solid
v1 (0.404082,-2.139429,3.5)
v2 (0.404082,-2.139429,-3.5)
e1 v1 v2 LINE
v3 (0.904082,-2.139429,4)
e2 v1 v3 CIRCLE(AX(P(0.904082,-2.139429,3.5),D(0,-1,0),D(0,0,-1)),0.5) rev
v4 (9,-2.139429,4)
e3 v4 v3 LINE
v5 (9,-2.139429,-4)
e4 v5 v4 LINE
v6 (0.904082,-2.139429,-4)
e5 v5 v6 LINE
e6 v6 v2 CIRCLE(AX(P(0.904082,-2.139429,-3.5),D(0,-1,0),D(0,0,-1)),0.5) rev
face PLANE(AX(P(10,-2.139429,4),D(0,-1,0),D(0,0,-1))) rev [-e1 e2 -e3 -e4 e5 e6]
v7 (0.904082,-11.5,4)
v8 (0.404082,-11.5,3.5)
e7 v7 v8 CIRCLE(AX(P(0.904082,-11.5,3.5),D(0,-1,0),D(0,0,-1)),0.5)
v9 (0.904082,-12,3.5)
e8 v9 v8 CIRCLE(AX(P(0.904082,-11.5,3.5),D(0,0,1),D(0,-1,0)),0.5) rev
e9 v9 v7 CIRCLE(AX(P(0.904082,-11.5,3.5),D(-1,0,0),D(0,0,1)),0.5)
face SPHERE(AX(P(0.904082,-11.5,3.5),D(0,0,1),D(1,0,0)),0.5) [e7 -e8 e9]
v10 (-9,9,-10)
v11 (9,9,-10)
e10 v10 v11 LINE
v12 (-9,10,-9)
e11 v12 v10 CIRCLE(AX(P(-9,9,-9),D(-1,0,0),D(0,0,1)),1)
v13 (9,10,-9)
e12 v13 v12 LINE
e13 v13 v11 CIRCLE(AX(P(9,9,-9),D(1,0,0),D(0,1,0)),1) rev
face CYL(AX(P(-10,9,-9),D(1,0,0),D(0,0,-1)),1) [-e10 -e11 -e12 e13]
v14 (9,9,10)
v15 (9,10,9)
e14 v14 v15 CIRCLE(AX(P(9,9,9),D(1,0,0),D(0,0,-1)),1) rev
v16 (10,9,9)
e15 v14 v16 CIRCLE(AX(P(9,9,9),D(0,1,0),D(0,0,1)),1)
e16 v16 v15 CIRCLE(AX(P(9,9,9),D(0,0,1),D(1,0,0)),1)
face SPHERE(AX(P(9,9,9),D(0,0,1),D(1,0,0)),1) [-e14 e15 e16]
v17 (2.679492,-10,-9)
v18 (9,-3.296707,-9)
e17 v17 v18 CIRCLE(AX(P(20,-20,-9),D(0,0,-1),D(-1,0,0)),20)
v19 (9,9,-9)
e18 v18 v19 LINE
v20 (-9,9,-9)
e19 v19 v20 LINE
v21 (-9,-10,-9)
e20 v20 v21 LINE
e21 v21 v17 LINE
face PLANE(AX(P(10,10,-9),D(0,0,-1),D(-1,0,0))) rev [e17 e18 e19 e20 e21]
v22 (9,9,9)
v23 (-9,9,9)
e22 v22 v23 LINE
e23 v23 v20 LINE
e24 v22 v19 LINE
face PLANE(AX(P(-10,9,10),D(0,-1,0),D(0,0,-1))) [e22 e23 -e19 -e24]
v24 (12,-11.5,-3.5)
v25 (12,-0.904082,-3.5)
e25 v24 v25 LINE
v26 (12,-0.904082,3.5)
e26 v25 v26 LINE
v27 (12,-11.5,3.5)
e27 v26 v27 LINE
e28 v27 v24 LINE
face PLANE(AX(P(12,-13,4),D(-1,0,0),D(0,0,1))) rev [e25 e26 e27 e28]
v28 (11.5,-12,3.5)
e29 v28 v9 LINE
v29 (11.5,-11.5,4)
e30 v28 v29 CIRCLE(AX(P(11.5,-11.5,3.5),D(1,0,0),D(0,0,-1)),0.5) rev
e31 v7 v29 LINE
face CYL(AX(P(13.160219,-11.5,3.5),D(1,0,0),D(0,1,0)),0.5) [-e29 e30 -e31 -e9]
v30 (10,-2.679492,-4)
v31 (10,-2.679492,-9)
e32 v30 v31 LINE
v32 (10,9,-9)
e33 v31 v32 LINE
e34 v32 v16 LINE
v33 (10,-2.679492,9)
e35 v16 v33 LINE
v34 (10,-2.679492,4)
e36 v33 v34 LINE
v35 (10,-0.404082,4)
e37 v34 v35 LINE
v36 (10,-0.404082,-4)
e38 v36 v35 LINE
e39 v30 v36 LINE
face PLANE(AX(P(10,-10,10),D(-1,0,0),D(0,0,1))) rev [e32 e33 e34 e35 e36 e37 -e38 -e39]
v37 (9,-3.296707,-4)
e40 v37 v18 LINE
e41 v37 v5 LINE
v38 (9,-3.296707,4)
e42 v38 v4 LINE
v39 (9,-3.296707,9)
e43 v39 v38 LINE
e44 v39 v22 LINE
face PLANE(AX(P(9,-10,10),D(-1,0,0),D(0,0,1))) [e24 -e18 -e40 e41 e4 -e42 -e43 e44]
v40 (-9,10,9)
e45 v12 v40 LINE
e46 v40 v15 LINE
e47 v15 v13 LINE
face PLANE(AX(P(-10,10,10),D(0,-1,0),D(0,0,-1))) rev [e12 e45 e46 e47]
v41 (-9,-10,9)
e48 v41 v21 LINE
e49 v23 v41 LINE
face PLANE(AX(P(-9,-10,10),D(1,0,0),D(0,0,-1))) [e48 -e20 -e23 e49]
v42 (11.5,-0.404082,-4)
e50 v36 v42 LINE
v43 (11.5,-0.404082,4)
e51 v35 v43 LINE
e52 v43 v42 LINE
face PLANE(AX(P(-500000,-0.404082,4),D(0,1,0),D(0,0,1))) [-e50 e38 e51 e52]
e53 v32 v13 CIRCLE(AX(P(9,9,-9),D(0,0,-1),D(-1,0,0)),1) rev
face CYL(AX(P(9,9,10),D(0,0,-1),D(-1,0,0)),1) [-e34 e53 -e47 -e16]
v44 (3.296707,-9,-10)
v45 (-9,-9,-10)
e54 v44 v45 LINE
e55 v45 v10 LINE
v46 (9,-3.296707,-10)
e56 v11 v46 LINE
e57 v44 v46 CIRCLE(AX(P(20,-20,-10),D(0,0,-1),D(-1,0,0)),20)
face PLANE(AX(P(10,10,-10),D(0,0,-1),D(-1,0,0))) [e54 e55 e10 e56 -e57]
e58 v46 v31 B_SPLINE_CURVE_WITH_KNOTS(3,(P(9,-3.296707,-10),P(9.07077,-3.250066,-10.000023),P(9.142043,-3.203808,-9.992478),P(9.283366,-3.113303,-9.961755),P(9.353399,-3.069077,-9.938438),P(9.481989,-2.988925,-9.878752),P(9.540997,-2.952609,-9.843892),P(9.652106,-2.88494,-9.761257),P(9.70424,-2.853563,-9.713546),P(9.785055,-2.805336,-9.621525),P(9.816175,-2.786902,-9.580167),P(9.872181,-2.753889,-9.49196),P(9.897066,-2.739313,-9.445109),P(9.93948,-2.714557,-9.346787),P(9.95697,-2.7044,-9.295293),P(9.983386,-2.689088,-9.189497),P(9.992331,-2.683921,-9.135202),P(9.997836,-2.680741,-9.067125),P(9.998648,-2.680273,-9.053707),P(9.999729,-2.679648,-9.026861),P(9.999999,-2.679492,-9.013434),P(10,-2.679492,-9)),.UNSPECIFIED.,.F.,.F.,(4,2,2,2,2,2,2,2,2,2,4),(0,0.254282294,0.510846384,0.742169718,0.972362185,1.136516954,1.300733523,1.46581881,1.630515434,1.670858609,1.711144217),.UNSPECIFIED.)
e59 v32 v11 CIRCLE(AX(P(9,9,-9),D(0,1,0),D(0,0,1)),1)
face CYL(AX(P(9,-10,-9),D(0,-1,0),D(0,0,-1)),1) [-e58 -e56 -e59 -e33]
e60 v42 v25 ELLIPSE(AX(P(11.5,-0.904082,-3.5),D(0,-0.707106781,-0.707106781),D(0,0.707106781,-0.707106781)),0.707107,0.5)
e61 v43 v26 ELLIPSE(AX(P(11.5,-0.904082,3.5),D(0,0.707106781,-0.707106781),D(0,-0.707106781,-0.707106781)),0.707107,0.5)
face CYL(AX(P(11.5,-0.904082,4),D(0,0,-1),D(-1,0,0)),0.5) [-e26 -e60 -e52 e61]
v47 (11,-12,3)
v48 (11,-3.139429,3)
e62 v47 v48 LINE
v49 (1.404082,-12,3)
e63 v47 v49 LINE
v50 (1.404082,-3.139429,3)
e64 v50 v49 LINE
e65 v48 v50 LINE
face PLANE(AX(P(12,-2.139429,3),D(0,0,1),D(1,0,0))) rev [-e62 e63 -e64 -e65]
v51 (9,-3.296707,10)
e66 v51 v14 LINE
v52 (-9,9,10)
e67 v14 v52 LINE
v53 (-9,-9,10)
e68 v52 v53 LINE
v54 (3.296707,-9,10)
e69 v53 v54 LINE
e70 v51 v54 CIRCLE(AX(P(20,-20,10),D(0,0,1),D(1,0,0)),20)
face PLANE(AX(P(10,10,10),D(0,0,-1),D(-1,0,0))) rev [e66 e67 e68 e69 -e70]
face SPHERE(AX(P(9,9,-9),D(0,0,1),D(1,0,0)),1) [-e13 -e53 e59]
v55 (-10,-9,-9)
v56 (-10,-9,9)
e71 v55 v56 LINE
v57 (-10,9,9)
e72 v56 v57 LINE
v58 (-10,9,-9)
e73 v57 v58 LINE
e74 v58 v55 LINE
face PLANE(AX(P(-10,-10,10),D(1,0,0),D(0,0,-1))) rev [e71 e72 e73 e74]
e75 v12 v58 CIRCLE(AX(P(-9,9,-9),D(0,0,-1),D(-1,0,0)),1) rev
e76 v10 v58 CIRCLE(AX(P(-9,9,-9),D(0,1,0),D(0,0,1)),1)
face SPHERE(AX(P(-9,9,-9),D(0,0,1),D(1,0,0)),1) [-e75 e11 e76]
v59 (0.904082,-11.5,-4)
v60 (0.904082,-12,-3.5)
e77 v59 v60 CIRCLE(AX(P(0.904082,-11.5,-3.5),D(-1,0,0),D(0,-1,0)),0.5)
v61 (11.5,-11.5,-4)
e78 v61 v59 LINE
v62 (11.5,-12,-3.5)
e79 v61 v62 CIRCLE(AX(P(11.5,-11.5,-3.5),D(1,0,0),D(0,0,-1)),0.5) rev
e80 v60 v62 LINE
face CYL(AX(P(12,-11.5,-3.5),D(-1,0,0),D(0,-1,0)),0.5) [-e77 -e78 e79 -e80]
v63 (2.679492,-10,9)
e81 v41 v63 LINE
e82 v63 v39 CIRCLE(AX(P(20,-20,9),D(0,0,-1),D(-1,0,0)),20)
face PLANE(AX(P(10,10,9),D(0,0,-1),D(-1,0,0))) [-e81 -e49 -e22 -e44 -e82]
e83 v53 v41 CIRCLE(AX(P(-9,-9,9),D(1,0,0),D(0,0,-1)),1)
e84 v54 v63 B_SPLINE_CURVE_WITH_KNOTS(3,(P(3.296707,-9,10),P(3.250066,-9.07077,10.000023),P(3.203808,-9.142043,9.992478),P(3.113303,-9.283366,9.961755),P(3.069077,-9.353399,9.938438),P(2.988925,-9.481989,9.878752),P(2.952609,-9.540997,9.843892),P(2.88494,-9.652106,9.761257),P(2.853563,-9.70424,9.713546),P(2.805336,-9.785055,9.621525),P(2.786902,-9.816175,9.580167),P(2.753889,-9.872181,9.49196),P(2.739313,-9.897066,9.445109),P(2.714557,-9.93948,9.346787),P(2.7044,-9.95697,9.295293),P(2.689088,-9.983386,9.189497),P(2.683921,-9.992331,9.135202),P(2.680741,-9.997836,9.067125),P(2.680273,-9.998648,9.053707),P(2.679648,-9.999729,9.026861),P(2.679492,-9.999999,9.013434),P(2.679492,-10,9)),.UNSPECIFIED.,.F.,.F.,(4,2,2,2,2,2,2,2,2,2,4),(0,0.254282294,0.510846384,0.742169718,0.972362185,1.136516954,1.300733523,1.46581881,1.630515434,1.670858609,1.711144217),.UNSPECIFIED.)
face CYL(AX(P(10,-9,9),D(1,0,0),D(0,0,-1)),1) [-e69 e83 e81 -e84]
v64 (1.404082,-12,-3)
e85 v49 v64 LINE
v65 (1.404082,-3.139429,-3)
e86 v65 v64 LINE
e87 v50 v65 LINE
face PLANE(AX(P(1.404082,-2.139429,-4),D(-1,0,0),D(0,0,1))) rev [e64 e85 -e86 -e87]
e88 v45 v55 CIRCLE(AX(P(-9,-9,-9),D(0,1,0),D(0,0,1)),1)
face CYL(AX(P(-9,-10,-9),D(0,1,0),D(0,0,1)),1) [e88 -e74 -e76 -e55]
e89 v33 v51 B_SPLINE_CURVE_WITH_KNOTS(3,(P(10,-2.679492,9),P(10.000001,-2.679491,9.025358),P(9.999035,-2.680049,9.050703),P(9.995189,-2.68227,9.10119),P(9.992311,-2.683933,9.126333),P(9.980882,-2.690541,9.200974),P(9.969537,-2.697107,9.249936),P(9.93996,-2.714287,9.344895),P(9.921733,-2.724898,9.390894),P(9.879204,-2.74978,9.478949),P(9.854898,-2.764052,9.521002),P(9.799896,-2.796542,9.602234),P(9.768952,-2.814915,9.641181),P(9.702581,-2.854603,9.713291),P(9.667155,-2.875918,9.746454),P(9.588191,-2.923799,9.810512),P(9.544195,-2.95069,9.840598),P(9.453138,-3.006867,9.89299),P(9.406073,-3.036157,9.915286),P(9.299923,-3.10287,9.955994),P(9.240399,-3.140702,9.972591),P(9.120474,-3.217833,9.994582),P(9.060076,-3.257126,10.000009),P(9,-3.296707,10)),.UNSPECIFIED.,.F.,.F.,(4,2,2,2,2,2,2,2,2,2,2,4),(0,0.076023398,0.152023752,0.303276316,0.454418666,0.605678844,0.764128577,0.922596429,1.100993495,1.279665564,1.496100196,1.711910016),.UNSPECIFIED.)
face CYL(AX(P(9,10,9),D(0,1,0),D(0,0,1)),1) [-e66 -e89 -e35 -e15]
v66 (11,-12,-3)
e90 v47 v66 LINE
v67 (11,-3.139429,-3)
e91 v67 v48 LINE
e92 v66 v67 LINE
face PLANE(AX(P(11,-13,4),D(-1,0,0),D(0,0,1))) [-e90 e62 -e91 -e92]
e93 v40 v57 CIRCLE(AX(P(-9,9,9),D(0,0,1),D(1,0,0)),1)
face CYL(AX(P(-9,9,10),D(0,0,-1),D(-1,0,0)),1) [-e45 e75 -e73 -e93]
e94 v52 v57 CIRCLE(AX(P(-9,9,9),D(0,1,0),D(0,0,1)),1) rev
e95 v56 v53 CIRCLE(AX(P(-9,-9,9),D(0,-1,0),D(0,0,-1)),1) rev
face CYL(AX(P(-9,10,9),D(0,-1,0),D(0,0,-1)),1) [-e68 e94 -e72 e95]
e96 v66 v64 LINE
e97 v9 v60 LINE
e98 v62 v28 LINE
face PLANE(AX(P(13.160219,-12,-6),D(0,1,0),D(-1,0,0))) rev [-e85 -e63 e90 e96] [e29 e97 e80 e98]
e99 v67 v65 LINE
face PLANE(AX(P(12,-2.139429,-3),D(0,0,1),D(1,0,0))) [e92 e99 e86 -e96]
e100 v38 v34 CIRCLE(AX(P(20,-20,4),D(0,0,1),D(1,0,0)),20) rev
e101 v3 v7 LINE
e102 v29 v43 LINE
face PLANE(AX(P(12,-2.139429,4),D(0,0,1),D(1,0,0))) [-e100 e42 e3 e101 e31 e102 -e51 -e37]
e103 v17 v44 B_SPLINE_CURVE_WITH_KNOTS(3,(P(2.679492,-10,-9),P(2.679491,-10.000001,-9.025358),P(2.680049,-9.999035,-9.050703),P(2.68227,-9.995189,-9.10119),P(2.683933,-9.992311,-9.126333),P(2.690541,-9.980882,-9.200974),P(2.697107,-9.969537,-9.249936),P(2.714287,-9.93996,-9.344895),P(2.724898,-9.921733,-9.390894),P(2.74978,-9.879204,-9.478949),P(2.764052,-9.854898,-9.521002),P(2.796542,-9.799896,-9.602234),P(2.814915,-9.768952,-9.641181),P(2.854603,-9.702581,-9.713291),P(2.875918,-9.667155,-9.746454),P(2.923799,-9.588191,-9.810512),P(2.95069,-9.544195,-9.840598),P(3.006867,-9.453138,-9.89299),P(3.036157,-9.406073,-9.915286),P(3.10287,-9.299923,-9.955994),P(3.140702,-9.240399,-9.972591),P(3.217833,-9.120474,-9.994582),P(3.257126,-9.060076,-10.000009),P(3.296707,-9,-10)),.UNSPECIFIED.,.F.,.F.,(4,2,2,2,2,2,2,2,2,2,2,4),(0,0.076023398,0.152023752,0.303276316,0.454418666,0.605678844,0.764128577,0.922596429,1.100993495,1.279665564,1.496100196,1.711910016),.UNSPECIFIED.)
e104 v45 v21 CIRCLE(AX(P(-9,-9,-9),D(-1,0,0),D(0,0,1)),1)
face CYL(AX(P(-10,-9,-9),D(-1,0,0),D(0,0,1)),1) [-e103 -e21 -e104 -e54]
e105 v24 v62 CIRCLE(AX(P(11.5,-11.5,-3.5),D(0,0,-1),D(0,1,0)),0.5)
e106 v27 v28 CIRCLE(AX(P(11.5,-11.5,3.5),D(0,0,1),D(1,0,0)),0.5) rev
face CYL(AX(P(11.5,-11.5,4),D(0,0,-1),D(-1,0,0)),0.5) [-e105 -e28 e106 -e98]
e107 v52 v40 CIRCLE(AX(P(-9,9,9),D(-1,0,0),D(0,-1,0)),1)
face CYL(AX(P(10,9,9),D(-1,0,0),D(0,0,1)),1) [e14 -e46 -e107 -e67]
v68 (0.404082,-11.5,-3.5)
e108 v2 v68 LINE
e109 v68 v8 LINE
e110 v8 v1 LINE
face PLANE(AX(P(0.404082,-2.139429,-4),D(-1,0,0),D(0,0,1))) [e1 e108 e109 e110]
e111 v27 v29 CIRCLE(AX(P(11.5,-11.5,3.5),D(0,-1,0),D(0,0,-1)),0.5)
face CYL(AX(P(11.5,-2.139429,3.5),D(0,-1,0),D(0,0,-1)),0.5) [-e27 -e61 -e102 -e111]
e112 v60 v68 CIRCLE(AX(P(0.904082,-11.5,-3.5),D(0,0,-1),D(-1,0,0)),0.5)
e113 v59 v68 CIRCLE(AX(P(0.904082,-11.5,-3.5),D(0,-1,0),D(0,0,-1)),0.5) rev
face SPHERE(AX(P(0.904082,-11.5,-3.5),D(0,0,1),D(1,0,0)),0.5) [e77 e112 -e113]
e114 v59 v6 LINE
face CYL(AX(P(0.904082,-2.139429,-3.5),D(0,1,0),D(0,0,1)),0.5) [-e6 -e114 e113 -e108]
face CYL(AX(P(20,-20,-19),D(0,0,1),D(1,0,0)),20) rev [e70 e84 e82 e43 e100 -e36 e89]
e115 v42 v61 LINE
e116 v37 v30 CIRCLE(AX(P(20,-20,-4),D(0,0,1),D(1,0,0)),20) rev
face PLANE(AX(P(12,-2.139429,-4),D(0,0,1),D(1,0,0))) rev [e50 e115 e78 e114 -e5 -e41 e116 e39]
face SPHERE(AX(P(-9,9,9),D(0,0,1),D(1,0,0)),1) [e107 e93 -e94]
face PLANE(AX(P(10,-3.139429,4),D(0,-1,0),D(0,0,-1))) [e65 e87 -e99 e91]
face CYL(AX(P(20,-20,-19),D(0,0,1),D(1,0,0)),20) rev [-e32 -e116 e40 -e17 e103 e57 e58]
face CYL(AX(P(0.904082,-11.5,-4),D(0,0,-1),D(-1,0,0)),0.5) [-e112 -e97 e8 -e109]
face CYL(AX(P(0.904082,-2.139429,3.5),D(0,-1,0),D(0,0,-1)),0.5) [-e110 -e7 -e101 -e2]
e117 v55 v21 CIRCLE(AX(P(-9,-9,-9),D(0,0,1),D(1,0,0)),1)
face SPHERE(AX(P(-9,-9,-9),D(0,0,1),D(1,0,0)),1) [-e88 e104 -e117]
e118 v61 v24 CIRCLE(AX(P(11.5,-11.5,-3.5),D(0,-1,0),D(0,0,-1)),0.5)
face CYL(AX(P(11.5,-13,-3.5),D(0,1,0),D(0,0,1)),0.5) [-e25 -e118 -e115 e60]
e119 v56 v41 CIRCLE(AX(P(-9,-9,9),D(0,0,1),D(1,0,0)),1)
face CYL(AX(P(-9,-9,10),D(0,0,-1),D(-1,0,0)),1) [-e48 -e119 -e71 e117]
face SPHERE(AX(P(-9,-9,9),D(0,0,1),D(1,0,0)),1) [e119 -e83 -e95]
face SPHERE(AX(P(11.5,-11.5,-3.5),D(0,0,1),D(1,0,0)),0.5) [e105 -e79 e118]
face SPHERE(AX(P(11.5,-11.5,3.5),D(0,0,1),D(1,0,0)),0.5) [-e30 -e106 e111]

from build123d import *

# Parameters (mm, degrees)
IZIM1_W                     = 20
IZIM1_H                     = 20
Y_KSEKLIK_EKSTR_ZYON1_DEPTH = 10
BO_ALTMA1_T                 = -1
IZIM2_R                     = 20
KES_EKSTR_ZYON1_DEPTH       = 29
Y_KSEKLIK_EKSTR_ZYON2_DEPTH = 4
Y_KSEKLIK_EKSTR_ZYON3_REACH = 29.441
IZIM4_W                     = 8
IZIM4_H                     = 1.735346843
Y_KSEKLIK_EKSTR_ZYON4_START = -10.860571
IZIM6_W                     = 1.735346843
IZIM6_H                     = 8
Y_KSEKLIK_EKSTR_ZYON4_DEPTH = 10.860571
BO_ALTMA2_START             = 1.404082058
BO_ALTMA2_OUTLINE_W         = 9.860571099
BO_ALTMA2_OUTLINE_H         = 6
BO_ALTMA2_DEPTH             = 9.595917942
BO_ALTMA2_START_2           = 10
BO_ALTMA2_2_OUTLINE_W       = 1.735346843
BO_ALTMA2_2_OUTLINE_H       = 6
BO_ALTMA2_2_DEPTH           = 1
IZIM7_W                     = 1
IZIM7_H                     = 6
Y_KSEKLIK_EKSTR_ZYON5_DEPTH = 1.735346843
RADYUS1_R                   = 1
RADYUS2_R                   = 1
IZIM8_W                     = 12.756136784
IZIM8_H                     = 3
KES_EKSTR_ZYON2_DEPTH       = 10
RADYUS3_R                   = 0.5


# Read off the part's stored shape, not the designer's step: __ İç Boşaltma2
with BuildPart() as part:
    # Çizim1 → Yükseklik-Ekstrüzyon1 (new, symmetric)
    with BuildSketch(Plane.XY):
        Rectangle(IZIM1_W, IZIM1_H)
    extrude(amount=Y_KSEKLIK_EKSTR_ZYON1_DEPTH, both=True)

    # İç Boşaltma1
    bo_altma1_openings = [part.faces().sort_by_distance(p)[0] for p in [
        (0, -10, 0),
    ]]
    offset(amount=BO_ALTMA1_T, openings=bo_altma1_openings, kind=Kind.INTERSECTION)

    # Çizim2 → Kes-Ekstrüzyon1 (cut)
    with BuildSketch(Plane.XY.offset(10)):
        with Locations((20, -20)):
            Circle(IZIM2_R)
    extrude(amount=-KES_EKSTR_ZYON1_DEPTH, mode=Mode.SUBTRACT)

    # Çizim3 → Yükseklik-Ekstrüzyon2 (add, symmetric)
    with BuildSketch(Plane.XY):
        Polygon((10, -2.139428901), (12, -2.139428901), (12, -13), (2.139428901, -13), (2.139428901, -11), (2.139428901, -2.139428901), align=None)
    extrude(amount=Y_KSEKLIK_EKSTR_ZYON2_DEPTH, both=True)

    # Çizim4 → Yükseklik-Ekstrüzyon3 (add, up to next)
    with BuildSketch(Plane(origin=(12, 0, 0), x_dir=(0, 0, -1), z_dir=(1, 0, 0)), mode=Mode.PRIVATE) as y_kseklik_ekstr_zyon3_sk1:
        with Locations((0, -1.27175548)):
            Rectangle(IZIM4_W, IZIM4_H)
    y_kseklik_ekstr_zyon3_tool1 = extrude(y_kseklik_ekstr_zyon3_sk1.sketch, amount=-Y_KSEKLIK_EKSTR_ZYON3_REACH, mode=Mode.PRIVATE) - part.part
    add(y_kseklik_ekstr_zyon3_tool1.solids().sort_by_distance((12, -1.271755, 0))[0])

    # Çizim6 → Yükseklik-Ekstrüzyon4 (add)
    with BuildSketch(Plane.XZ.offset(13).offset(Y_KSEKLIK_EKSTR_ZYON4_START)):
        with Locations((1.27175548, 0)):
            Rectangle(IZIM6_W, IZIM6_H)
    extrude(amount=Y_KSEKLIK_EKSTR_ZYON4_DEPTH)

    # İç Boşaltma2 outline → İç Boşaltma2 (cut)
    with BuildSketch(Plane.YZ.offset(BO_ALTMA2_START)):
        with Locations((-8.06971445, 0)):
            Rectangle(BO_ALTMA2_OUTLINE_W, BO_ALTMA2_OUTLINE_H)
    extrude(amount=BO_ALTMA2_DEPTH, mode=Mode.SUBTRACT)

    # Bo_altma2 2 outline → Bo_altma2 2 (cut)
    with BuildSketch(Plane.YZ.offset(BO_ALTMA2_START_2)):
        with Locations((-2.27175548, 0)):
            Rectangle(BO_ALTMA2_2_OUTLINE_W, BO_ALTMA2_2_OUTLINE_H)
    extrude(amount=BO_ALTMA2_2_DEPTH, mode=Mode.SUBTRACT)

    # Çizim7 → Yükseklik-Ekstrüzyon5 (add)
    with BuildSketch(Plane.XZ.offset(3.139428901)):
        with Locations((10.5, 0)):
            Rectangle(IZIM7_W, IZIM7_H)
    extrude(amount=-Y_KSEKLIK_EKSTR_ZYON5_DEPTH)

    # Radyus1
    radyus1_edges = [part.edges().sort_by_distance(p)[0] for p in [
        (-10, 0, 10),
        (10, 3.660254038, -10),
        (10, 3.660254038, 10),
        (-10, 0, -10),
        (0, 10, -10),
        (0, 10, 10),
        (-10, 10, 0),
        (10, 10, 0),
    ]]
    fillet(radyus1_edges, radius=RADYUS1_R)

    # Radyus2
    radyus2_edges = [part.edges().sort_by_distance(p)[0] for p in [
        (-3.160254038, -10, 10),
        (-9.707106781, -10, 9.707106781),
        (-3.160254038, -10, -10),
        (-9.707106781, -10, -9.707106781),
        (-10, -10, 0),
    ]]
    fillet(radyus2_edges, radius=RADYUS2_R - 0.0001)  # a hair under: the kernel refuses the full size

    # Çizim8 → Kes-Ekstrüzyon2 (cut)
    with BuildSketch(Plane.XY.offset(4)):
        with Locations((6.78215045, -13.5)):
            Rectangle(IZIM8_W, IZIM8_H)
    extrude(amount=-KES_EKSTR_ZYON2_DEPTH, mode=Mode.SUBTRACT)

    # Radyus3
    radyus3_edges = [part.edges().sort_by_distance(p)[0] for p in [
        (12, -6.202041029, -4),
        (12, -6.202041029, 4),
        (6.202041029, -12, 4),
        (12, -12, 0),
        (6.202041029, -12, -4),
        (0.404082058, -12, 0),
        (12, -0.404082058, 0),
        (0.404082058, -7.0697145, -4),
        (0.404082058, -7.0697145, 4),
    ]]
    fillet(radyus3_edges, radius=RADYUS3_R)


solid = part.part
